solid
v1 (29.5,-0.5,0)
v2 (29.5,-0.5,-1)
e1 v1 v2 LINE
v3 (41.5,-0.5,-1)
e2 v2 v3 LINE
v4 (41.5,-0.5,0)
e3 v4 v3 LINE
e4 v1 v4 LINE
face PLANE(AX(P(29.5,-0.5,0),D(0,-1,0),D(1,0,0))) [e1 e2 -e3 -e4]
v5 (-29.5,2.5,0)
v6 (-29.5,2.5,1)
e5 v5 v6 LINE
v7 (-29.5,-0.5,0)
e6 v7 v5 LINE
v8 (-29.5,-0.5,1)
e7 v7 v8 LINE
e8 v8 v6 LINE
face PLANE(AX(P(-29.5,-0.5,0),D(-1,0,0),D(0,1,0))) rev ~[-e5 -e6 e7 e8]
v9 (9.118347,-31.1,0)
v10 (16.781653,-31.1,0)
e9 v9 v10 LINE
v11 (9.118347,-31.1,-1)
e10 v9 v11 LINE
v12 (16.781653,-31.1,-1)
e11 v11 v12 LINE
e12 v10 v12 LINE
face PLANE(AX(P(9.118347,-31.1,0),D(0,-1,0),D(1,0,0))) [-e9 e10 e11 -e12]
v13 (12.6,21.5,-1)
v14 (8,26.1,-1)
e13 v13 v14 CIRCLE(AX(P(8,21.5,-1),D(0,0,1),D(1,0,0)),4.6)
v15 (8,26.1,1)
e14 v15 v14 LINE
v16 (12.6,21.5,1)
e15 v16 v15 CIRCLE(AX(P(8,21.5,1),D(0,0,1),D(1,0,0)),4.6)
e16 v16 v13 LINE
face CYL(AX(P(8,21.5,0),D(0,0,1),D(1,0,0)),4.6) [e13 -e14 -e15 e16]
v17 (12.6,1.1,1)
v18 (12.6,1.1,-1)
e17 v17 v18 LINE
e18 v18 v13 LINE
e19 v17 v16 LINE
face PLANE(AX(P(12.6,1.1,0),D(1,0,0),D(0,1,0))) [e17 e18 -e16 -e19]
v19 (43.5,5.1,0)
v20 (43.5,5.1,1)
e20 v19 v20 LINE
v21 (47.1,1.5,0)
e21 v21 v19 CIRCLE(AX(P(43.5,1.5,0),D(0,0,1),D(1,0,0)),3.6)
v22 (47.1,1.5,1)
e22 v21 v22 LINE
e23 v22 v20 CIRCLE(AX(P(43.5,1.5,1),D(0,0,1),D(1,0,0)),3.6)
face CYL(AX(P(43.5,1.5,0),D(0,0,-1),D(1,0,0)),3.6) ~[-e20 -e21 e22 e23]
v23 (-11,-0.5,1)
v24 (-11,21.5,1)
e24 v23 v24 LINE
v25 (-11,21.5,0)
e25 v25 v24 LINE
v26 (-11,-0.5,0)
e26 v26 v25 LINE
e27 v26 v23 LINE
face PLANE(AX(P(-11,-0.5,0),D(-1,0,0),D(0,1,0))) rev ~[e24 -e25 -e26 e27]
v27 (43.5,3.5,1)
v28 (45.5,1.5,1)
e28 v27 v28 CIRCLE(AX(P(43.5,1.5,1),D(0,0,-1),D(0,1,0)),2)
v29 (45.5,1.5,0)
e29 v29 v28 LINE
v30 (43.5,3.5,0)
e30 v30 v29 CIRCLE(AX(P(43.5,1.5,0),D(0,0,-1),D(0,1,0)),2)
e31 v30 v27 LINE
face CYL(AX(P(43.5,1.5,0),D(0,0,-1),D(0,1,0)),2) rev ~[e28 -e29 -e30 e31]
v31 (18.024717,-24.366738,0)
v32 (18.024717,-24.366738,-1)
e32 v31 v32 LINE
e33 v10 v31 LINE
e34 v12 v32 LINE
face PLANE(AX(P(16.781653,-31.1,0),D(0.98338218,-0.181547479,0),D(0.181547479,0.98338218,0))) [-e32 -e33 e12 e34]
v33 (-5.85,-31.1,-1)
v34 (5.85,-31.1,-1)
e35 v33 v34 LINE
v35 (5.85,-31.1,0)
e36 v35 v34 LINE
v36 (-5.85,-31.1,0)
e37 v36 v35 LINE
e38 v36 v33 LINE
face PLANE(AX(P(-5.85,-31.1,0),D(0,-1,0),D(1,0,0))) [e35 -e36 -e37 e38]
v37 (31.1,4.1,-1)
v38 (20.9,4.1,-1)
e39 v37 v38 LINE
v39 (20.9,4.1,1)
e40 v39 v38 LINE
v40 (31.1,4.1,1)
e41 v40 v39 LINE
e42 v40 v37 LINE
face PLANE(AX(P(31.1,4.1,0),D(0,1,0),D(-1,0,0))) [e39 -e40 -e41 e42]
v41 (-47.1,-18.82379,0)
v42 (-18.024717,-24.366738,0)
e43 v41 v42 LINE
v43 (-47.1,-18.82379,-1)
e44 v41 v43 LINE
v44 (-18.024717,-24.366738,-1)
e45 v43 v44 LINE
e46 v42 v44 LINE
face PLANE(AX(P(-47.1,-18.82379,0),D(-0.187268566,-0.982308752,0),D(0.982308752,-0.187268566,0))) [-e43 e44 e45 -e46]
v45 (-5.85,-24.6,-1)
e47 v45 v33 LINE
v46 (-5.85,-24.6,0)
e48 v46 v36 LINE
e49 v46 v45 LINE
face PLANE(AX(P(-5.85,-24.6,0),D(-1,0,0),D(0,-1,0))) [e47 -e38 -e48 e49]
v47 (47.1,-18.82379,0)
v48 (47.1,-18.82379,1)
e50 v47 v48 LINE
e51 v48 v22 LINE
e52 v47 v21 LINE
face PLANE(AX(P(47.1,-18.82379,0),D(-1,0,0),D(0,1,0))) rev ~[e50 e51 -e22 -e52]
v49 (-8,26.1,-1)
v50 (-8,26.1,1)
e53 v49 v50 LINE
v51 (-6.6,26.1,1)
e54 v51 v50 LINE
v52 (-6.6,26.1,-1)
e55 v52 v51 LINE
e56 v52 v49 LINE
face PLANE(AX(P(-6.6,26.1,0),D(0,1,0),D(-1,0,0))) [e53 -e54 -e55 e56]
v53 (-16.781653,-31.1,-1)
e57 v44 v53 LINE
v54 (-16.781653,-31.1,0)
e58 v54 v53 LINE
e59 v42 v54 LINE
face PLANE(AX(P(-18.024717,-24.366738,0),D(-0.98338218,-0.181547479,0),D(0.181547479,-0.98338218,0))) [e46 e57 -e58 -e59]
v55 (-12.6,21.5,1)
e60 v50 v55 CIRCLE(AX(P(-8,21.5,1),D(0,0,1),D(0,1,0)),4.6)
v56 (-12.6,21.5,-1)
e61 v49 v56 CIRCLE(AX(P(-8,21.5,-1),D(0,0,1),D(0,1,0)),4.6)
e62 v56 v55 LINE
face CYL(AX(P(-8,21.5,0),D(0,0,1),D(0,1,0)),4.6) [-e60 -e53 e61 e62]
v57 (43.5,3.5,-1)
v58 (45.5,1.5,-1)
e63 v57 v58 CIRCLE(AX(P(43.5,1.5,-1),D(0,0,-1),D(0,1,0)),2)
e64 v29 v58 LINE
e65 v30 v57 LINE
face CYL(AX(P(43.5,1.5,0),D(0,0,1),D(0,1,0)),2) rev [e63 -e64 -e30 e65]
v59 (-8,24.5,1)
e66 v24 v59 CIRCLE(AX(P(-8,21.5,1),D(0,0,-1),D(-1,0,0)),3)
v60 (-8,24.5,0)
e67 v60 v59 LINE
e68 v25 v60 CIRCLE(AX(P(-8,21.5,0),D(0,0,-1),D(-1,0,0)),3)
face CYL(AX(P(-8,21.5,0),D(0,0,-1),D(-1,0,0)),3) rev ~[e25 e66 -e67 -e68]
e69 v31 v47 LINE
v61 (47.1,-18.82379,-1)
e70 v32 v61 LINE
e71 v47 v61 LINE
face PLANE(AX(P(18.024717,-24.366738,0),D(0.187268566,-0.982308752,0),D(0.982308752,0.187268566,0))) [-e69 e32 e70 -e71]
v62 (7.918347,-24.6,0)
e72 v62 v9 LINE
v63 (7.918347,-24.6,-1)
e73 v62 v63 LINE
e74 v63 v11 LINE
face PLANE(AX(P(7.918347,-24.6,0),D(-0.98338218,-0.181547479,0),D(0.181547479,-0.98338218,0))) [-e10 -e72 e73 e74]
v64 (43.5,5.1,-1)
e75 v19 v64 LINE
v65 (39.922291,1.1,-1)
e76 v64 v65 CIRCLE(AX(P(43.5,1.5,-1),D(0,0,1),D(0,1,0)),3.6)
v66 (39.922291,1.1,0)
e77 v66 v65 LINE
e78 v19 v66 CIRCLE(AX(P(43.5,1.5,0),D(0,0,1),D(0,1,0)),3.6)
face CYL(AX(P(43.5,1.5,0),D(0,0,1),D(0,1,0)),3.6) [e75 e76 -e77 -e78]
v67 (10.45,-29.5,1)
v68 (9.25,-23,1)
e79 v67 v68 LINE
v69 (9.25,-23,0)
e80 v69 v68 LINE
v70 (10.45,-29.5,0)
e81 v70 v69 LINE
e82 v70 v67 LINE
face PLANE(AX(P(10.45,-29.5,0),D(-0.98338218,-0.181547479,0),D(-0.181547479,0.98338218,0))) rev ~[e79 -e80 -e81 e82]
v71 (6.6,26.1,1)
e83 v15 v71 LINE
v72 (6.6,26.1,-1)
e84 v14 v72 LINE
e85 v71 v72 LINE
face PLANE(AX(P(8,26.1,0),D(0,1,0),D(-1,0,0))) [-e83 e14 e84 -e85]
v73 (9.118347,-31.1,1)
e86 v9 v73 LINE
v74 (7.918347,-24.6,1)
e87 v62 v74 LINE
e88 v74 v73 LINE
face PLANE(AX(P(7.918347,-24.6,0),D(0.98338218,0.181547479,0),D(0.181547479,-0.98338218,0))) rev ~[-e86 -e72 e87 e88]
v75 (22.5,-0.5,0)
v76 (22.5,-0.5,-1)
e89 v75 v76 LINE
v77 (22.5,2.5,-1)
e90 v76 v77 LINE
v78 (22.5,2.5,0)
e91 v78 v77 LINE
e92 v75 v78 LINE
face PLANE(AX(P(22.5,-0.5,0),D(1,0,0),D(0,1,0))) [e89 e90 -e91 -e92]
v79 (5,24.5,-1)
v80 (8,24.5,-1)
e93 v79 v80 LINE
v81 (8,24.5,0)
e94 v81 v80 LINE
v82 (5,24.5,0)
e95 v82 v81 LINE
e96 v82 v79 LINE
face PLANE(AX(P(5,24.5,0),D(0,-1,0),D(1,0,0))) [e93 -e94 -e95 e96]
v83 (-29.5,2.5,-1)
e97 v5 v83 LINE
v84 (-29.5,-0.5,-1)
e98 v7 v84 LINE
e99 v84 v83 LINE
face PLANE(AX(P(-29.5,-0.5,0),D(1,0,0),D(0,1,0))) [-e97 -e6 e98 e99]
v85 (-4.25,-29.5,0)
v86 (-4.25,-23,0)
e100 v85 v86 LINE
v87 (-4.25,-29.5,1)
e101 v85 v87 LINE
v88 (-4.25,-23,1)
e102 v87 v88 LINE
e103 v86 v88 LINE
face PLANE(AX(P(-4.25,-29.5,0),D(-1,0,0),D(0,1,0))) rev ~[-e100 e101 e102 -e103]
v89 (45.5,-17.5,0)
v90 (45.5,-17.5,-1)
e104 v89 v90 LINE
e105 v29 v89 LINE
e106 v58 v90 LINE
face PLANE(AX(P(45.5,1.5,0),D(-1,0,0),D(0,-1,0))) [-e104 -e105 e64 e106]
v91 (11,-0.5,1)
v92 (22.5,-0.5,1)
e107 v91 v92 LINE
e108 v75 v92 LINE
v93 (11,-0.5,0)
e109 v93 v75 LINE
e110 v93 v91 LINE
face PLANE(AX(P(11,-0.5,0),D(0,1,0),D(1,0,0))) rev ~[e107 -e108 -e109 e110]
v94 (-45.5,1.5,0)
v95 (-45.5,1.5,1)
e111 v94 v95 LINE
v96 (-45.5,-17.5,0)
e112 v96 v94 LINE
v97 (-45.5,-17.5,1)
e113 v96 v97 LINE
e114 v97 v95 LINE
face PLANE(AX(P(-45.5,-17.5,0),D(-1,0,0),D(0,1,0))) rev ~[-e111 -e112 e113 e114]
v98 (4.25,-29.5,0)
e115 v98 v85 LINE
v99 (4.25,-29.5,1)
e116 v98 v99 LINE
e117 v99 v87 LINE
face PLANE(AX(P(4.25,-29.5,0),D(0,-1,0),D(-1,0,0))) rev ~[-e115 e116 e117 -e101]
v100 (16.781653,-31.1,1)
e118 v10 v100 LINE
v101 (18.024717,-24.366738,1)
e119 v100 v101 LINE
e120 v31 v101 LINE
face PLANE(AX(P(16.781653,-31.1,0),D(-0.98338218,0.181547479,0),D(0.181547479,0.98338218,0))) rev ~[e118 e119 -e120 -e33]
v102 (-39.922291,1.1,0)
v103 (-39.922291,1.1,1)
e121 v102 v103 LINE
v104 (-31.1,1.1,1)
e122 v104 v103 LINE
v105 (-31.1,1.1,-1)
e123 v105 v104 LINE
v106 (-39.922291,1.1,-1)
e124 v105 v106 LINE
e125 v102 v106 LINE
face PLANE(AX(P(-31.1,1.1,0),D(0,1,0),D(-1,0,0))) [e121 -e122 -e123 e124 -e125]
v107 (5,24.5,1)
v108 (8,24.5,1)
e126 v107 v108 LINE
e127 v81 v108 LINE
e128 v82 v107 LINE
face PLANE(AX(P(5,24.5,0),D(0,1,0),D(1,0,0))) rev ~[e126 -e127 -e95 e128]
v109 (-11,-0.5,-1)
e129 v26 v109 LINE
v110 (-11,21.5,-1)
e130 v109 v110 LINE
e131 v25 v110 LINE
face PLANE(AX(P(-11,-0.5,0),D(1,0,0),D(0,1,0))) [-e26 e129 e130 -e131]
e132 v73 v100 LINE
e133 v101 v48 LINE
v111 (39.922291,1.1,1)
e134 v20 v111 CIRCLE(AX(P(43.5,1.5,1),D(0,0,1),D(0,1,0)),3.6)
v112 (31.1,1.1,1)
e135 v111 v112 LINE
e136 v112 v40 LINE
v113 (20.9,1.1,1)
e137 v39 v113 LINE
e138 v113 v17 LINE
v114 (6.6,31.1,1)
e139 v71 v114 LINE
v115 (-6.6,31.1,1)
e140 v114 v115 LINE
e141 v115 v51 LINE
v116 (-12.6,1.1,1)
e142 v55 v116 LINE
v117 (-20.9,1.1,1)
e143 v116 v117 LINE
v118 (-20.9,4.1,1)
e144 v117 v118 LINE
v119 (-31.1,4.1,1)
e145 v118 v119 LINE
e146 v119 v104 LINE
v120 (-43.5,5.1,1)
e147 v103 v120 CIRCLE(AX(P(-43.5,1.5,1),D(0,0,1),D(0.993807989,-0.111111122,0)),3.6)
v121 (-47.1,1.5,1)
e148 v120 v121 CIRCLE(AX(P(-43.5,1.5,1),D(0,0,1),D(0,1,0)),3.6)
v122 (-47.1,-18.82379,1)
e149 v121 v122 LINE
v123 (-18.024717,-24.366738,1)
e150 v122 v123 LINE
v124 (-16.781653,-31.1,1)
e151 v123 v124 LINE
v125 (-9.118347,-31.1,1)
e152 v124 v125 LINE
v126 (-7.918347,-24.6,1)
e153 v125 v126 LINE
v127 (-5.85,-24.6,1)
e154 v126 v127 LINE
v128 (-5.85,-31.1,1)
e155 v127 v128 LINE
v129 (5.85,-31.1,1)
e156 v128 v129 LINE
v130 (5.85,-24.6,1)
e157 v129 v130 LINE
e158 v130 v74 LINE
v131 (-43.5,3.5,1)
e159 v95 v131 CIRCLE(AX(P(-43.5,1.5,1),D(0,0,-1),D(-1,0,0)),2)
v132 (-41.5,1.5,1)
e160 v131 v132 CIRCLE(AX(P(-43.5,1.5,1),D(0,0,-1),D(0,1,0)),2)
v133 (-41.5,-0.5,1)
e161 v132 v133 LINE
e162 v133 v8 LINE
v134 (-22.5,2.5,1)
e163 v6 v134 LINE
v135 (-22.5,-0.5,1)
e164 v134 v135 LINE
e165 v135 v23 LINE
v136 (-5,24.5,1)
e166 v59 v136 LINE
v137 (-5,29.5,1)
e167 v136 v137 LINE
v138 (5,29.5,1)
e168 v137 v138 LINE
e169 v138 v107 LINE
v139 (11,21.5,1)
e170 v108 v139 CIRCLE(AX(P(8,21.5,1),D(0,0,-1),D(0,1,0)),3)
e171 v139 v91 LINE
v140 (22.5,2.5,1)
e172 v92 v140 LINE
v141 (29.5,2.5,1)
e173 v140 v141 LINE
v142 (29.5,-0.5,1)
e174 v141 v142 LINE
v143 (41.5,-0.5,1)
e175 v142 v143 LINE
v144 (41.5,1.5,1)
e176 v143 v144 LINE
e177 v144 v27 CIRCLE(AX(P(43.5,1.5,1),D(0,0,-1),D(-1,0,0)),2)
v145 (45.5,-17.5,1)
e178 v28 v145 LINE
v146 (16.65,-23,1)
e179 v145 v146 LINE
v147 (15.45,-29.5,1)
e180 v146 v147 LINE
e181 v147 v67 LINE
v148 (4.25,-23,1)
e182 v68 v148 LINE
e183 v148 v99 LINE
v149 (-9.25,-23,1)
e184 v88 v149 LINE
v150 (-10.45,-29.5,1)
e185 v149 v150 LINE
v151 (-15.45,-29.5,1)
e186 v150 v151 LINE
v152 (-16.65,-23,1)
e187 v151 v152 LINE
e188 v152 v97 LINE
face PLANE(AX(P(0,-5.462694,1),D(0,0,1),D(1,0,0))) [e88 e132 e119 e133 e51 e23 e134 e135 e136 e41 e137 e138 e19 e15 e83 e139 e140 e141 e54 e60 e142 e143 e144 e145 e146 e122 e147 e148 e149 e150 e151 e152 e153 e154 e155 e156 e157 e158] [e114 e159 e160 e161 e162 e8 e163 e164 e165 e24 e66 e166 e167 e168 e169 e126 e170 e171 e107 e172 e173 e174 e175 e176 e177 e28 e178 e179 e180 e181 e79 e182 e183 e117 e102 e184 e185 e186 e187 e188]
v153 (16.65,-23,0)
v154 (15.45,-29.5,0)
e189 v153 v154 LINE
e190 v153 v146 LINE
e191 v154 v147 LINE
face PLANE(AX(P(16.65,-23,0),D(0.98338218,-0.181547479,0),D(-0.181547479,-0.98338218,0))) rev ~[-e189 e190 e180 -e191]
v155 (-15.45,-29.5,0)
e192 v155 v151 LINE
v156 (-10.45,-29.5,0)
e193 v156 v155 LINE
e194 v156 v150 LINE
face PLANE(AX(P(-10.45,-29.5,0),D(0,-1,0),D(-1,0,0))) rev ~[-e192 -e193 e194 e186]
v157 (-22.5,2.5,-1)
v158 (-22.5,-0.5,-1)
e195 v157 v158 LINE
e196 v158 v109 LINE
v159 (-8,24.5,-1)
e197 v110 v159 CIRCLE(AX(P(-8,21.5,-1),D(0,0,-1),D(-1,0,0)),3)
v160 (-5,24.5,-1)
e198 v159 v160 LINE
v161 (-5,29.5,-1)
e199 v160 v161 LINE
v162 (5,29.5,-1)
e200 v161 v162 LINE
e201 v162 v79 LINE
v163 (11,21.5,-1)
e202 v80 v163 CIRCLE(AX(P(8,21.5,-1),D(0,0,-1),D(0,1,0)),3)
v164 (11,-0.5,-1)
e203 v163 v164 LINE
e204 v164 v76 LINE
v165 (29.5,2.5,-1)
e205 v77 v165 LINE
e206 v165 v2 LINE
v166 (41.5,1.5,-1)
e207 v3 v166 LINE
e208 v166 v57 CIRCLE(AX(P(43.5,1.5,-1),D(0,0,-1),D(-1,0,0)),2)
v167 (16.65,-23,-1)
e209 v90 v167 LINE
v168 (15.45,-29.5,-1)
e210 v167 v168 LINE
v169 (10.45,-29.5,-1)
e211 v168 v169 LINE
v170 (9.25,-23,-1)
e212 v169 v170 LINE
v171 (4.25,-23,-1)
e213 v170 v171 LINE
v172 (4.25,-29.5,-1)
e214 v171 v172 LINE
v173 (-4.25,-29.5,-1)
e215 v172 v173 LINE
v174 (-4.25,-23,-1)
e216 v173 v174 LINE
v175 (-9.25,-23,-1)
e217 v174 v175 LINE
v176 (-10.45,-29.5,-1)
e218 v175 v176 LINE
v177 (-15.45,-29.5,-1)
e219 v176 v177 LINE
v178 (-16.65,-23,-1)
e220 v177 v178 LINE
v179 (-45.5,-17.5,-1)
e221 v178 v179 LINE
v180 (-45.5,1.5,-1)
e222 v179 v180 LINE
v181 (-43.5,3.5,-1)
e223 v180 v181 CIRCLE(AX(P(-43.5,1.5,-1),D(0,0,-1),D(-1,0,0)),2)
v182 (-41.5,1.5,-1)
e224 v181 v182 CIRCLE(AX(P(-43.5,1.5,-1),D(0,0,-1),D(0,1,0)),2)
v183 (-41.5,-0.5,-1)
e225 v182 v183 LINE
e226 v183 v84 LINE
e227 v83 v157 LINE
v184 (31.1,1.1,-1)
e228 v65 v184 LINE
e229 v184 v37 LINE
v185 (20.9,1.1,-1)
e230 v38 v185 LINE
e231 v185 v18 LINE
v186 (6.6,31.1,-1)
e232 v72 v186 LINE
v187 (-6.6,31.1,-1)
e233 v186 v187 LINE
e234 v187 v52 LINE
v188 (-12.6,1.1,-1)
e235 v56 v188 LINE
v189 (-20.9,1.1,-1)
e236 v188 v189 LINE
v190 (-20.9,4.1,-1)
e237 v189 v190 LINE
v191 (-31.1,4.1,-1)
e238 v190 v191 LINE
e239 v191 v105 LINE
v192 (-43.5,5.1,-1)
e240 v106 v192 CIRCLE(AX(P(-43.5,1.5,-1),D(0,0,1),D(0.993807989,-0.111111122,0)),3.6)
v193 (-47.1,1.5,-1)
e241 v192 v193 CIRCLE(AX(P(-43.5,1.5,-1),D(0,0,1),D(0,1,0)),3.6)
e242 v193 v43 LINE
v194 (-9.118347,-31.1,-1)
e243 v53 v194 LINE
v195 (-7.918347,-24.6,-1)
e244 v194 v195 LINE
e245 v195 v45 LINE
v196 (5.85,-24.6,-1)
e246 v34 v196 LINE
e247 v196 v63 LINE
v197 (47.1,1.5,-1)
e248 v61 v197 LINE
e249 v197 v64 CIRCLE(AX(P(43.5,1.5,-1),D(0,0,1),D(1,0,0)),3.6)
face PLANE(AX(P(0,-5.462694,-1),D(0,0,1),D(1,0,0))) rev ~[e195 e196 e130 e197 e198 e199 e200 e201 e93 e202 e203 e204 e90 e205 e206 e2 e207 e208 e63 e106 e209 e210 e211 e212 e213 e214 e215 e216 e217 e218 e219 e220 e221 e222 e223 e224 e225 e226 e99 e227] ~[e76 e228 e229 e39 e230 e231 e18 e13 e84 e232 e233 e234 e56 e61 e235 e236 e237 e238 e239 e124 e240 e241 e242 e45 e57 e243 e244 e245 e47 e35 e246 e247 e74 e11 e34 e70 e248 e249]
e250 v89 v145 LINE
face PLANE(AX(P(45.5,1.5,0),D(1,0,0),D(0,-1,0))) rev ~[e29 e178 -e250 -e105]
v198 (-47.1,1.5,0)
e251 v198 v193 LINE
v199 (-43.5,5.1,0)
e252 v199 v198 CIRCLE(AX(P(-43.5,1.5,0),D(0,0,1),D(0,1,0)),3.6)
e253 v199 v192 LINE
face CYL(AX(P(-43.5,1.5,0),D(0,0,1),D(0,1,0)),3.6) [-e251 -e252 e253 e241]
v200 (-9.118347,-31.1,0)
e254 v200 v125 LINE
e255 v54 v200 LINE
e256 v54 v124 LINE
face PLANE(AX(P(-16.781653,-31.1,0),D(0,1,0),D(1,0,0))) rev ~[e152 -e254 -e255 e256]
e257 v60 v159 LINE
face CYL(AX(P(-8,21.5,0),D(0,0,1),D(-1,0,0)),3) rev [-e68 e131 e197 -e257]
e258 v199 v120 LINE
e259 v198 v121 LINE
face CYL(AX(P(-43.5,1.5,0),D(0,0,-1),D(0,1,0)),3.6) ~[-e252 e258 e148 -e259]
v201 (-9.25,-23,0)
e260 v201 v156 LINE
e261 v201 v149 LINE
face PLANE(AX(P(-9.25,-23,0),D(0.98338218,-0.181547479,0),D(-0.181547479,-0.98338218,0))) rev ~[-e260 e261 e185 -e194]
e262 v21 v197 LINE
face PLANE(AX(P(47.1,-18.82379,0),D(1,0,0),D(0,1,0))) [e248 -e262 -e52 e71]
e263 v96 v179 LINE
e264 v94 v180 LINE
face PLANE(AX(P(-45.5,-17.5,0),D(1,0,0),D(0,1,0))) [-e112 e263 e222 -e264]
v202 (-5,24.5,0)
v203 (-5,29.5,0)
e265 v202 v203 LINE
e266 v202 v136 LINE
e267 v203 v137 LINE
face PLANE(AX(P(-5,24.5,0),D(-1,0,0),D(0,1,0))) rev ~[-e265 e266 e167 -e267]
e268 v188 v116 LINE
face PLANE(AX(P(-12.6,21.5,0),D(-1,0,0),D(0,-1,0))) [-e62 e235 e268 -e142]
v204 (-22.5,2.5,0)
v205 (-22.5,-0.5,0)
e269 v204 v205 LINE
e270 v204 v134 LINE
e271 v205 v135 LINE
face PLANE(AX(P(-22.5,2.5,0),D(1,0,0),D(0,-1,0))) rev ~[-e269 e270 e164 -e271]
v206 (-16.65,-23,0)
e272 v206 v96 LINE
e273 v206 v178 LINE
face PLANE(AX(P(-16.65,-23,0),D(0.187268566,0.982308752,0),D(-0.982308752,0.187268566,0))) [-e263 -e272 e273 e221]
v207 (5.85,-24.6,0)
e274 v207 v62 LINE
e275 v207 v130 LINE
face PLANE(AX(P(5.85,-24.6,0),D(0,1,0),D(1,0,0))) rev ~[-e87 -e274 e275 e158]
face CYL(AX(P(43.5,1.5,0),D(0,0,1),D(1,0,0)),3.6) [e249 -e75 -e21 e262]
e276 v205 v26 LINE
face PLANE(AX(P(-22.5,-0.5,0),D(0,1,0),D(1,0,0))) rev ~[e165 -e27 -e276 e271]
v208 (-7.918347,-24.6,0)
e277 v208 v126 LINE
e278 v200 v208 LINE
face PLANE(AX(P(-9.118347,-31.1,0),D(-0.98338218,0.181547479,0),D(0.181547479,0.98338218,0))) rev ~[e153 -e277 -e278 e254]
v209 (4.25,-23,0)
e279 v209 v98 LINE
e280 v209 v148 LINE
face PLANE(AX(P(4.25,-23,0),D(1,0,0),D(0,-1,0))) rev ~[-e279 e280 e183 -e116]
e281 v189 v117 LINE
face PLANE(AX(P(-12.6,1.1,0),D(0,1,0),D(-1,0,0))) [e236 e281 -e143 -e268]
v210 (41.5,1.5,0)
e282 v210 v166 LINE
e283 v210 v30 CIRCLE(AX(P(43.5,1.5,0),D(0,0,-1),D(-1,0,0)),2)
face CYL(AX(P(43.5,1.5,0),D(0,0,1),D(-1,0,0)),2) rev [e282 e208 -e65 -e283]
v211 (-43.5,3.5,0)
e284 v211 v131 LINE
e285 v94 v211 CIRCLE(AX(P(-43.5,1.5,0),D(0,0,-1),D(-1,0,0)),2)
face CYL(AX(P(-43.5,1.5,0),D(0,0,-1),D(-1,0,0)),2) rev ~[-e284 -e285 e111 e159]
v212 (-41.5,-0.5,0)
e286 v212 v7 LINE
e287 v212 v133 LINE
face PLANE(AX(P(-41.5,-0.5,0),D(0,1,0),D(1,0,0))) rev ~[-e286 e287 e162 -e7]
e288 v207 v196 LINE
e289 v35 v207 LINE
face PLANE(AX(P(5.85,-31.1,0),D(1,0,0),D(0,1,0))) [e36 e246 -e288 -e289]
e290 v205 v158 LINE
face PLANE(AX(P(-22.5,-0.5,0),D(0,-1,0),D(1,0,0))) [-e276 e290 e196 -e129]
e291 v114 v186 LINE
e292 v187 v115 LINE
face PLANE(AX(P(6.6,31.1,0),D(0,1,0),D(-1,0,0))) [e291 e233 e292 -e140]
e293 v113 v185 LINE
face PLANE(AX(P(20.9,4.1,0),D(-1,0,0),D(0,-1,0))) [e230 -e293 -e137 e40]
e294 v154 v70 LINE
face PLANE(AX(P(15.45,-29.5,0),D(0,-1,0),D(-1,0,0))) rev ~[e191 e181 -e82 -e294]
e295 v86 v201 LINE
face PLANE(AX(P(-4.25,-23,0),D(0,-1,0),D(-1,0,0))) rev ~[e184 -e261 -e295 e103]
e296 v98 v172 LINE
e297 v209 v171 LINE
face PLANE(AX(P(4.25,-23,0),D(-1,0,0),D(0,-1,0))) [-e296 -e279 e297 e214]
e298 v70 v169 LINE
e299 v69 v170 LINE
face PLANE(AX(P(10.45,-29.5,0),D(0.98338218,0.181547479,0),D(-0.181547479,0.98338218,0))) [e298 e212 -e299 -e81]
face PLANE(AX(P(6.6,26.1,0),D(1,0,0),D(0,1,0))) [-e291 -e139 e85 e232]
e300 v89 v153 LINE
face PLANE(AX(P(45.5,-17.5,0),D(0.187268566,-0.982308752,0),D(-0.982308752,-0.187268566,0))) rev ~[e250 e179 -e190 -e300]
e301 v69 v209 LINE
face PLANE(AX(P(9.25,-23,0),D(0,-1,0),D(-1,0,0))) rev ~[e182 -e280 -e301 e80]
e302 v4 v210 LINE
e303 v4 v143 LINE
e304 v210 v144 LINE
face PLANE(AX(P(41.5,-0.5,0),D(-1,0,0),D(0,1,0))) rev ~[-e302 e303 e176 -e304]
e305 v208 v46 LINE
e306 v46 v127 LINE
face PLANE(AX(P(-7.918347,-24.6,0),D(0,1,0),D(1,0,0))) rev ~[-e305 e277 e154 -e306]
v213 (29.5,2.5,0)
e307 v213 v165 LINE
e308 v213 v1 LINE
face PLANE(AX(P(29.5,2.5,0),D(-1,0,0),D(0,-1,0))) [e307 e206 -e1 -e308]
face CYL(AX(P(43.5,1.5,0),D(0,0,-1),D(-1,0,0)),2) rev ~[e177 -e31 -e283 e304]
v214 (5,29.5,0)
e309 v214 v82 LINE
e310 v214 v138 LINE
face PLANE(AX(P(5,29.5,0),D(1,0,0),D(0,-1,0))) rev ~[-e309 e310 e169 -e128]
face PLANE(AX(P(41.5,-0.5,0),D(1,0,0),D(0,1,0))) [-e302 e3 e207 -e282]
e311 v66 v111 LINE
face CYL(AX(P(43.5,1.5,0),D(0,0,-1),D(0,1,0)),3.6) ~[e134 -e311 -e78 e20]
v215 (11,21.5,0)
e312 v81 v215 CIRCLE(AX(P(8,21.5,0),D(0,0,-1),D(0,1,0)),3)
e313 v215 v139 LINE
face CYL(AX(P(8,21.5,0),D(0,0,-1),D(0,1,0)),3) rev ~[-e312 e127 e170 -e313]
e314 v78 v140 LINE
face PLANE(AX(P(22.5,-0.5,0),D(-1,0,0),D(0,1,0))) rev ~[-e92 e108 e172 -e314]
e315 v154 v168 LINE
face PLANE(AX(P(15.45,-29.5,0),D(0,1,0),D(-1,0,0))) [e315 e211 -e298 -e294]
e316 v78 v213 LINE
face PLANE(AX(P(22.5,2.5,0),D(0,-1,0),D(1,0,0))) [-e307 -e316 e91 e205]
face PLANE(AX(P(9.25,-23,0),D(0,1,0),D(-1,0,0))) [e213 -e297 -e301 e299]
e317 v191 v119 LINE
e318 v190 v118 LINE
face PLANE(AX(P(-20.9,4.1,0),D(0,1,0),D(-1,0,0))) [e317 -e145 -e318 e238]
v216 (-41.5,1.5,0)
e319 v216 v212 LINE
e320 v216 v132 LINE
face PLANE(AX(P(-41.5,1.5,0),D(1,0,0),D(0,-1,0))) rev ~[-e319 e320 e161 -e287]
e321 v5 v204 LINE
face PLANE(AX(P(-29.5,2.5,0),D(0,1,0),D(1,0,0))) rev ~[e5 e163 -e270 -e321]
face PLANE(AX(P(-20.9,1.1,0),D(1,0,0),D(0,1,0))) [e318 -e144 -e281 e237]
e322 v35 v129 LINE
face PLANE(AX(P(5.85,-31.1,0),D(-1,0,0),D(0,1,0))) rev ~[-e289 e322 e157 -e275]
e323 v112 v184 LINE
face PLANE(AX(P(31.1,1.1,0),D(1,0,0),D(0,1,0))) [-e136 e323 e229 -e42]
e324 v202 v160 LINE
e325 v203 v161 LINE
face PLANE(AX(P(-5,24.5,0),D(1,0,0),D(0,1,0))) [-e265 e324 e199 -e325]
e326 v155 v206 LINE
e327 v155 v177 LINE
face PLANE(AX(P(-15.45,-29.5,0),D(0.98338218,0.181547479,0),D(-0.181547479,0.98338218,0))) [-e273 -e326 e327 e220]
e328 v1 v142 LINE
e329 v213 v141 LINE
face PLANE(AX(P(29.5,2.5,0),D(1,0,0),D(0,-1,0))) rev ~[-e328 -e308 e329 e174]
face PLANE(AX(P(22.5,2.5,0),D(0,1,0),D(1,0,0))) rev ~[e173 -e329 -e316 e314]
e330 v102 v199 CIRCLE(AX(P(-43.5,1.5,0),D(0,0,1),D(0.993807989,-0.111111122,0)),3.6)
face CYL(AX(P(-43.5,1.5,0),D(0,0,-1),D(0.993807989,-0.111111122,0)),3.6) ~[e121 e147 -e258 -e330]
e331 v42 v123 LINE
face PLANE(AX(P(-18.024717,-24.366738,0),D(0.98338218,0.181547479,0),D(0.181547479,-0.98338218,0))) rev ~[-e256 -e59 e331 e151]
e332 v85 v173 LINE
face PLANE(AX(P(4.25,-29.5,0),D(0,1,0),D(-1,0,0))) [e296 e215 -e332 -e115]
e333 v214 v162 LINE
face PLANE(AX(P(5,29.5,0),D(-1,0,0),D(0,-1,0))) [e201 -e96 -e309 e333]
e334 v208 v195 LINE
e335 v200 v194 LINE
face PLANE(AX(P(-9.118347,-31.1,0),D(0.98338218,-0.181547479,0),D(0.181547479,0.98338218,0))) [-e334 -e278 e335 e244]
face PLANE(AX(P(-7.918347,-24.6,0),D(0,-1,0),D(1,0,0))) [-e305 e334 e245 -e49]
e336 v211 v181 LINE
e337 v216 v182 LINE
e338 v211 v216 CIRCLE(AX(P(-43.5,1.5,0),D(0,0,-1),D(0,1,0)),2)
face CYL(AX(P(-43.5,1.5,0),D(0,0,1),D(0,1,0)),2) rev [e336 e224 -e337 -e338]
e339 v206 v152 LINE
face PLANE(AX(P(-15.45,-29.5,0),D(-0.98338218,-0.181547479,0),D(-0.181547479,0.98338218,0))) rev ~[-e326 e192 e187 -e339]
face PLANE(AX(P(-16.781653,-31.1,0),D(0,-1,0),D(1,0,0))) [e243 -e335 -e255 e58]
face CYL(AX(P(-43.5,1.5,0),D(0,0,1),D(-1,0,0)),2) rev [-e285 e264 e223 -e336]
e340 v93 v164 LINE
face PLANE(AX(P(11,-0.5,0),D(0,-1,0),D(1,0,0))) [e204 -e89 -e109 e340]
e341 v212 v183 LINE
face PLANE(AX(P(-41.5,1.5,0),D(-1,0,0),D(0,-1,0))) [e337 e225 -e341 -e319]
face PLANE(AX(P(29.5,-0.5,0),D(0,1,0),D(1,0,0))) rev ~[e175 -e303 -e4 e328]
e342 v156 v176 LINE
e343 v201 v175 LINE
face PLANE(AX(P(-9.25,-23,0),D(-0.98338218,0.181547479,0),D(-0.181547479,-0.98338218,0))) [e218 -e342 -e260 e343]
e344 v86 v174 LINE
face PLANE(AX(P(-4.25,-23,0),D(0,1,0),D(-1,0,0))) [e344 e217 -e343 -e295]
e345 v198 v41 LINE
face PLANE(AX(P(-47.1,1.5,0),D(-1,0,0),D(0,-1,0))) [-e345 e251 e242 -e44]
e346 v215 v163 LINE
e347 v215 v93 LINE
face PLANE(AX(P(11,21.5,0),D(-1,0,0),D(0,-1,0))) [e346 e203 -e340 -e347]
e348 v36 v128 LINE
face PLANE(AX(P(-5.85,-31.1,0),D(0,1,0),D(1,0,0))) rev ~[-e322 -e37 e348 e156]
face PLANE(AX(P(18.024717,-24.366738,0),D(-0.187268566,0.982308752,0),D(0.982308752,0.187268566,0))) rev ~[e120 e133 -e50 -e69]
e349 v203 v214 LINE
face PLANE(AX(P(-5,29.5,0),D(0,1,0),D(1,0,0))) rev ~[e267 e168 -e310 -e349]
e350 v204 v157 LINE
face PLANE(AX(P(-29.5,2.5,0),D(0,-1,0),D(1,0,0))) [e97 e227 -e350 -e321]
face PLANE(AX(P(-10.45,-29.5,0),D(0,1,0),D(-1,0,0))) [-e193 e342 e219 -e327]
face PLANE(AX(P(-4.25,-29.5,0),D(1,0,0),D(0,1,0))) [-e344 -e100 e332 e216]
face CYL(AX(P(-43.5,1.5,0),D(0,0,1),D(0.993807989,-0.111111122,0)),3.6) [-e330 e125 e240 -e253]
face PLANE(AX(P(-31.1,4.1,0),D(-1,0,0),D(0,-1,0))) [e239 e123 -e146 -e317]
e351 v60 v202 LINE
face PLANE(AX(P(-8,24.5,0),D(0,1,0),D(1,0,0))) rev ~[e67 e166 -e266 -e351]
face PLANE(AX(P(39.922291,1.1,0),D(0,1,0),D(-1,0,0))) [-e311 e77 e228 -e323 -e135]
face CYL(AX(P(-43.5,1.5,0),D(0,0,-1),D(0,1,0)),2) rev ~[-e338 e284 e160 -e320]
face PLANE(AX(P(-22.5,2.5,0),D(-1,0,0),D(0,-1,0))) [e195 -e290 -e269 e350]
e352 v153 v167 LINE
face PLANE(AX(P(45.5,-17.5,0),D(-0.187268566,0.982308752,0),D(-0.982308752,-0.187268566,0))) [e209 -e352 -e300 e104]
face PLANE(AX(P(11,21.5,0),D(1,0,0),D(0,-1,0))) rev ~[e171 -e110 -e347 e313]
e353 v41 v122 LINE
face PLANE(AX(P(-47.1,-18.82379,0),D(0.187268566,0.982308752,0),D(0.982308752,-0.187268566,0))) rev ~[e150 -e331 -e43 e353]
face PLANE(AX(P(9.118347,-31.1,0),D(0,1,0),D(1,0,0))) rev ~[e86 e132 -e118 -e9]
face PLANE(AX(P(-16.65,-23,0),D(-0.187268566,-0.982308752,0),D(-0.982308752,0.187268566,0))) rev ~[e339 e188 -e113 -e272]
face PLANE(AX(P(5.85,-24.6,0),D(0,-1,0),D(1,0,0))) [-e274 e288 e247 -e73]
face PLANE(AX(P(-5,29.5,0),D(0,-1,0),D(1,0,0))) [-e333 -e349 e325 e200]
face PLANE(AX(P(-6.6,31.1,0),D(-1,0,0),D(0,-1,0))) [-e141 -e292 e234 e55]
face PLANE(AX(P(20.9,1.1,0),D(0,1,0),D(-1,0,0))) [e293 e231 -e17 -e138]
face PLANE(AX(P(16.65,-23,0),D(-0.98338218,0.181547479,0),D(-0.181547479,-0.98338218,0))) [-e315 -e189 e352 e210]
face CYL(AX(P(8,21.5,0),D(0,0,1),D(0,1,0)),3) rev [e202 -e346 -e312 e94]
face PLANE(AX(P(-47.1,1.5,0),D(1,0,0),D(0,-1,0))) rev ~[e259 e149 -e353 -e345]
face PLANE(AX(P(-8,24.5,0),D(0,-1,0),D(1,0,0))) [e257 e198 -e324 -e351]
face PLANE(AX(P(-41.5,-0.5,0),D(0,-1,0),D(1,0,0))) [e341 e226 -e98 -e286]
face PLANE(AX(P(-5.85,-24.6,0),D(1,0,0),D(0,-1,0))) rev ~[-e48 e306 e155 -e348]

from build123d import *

# Parameters (mm, degrees)
F1_DEPTH = 1


# Not quite as in the source:
# - a feature names something its author has since deleted; it is built from what else it names


with BuildPart() as f1:
    # F0 (on Top) → F1 (new body, symmetric)
    with BuildSketch(Plane.XY):
        with BuildLine():
            Line((6.5999999642, 31.0999999642), (0, 31.0999999642))
            Line((0, 31.0999999642), (-6.5999999642, 31.0999999642))
            Line((-6.5999999642, 31.0999999642), (-6.5999999642, 26.0999999642))
            Line((-6.5999999642, 26.0999999642), (-8, 26.0999999642))
            ThreePointArc((-8, 26.0999999642), (-11.2526911682, 24.7526911682), (-12.5999999642, 21.5))
            Line((-12.5999999642, 21.5), (-12.5999999642, 1.0999999642))
            Line((-12.5999999642, 1.0999999642), (-20.9000000358, 1.0999999642))
            Line((-20.9000000358, 1.0999999642), (-20.9000000358, 4.0999999642))
            Line((-20.9000000358, 4.0999999642), (-31.0999999642, 4.0999999642))
            Line((-31.0999999642, 4.0999999642), (-31.0999999642, 1.0999999642))
            Line((-31.0999999642, 1.0999999642), (-39.922291276, 1.0999999642))
            ThreePointArc((-39.922291276, 1.0999999642), (-40.8167184403, 3.8999999613), (-43.5, 5.0999999642))
            ThreePointArc((-43.5, 5.0999999642), (-46.045584387, 4.045584387), (-47.0999999642, 1.5))
            Line((-47.0999999642, 1.5), (-47.0999999642, -18.823789758))
            Line((-47.0999999642, -18.823789758), (-18.0247169235, -24.366737998))
            Line((-18.0247169235, -24.366737998), (-16.7816531759, -31.0999999642))
            Line((-16.7816531759, -31.0999999642), (-9.1183468241, -31.0999999642))
            Line((-9.1183468241, -31.0999999642), (-7.9183468241, -24.5999999642))
            Line((-7.9183468241, -24.5999999642), (-5.8499999642, -24.5999999642))
            Line((-5.8499999642, -24.5999999642), (-5.8499999642, -31.0999999642))
            Line((-5.8499999642, -31.0999999642), (0, -31.0999999642))
            Line((0, -31.0999999642), (5.8499999642, -31.0999999642))
            Line((5.8499999642, -31.0999999642), (5.8499999642, -24.5999999642))
            Line((5.8499999642, -24.5999999642), (7.9183468241, -24.5999999642))
            Line((7.9183468241, -24.5999999642), (9.1183468241, -31.0999999642))
            Line((9.1183468241, -31.0999999642), (16.7816531759, -31.0999999642))
            Line((16.7816531759, -31.0999999642), (18.0247169235, -24.366737998))
            Line((18.0247169235, -24.366737998), (47.0999999642, -18.823789758))
            Line((47.0999999642, -18.823789758), (47.0999999642, 1.5))
            ThreePointArc((47.0999999642, 1.5), (46.045584387, 4.045584387), (43.5, 5.0999999642))
            ThreePointArc((43.5, 5.0999999642), (40.8167184403, 3.8999999613), (39.922291276, 1.0999999642))
            Line((39.922291276, 1.0999999642), (31.0999999642, 1.0999999642))
            Line((31.0999999642, 1.0999999642), (31.0999999642, 4.0999999642))
            Line((31.0999999642, 4.0999999642), (20.9000000358, 4.0999999642))
            Line((20.9000000358, 4.0999999642), (20.9000000358, 1.0999999642))
            Line((20.9000000358, 1.0999999642), (12.5999999642, 1.0999999642))
            Line((12.5999999642, 1.0999999642), (12.5999999642, 21.5))
            ThreePointArc((12.5999999642, 21.5), (11.2526911682, 24.7526911682), (8, 26.0999999642))
            Line((8, 26.0999999642), (6.5999999642, 26.0999999642))
            Line((6.5999999642, 26.0999999642), (6.5999999642, 31.0999999642))
        make_face()
        with BuildLine():
            Line((-5, 29.5), (0, 29.5))
            Line((0, 29.5), (5, 29.5))
            Line((5, 29.5), (5, 24.5))
            Line((5, 24.5), (8, 24.5))
            ThreePointArc((8, 24.5), (10.1213203436, 23.6213203436), (11, 21.5))
            Line((11, 21.5), (11, -0.5))
            Line((11, -0.5), (22.5, -0.5))
            Line((22.5, -0.5), (22.5, 2.5))
            Line((22.5, 2.5), (29.5, 2.5))
            Line((29.5, 2.5), (29.5, -0.5))
            Line((29.5, -0.5), (41.5, -0.5))
            Line((41.5, -0.5), (41.5, 1.5))
            ThreePointArc((41.5, 1.5), (42.0857864376, 2.9142135624), (43.5, 3.5))
            ThreePointArc((43.5, 3.5), (44.9142135624, 2.9142135624), (45.5, 1.5))
            Line((45.5, 1.5), (45.5, -17.5))
            Line((45.5, -17.5), (16.65, -23))
            Line((16.65, -23), (15.45, -29.5))
            Line((15.45, -29.5), (10.45, -29.5))
            Line((10.45, -29.5), (9.25, -23))
            Line((9.25, -23), (4.25, -23))
            Line((4.25, -23), (4.25, -29.5))
            Line((4.25, -29.5), (0, -29.5))
            Line((0, -29.5), (-4.25, -29.5))
            Line((-4.25, -29.5), (-4.25, -23))
            Line((-4.25, -23), (-9.25, -23))
            Line((-9.25, -23), (-10.45, -29.5))
            Line((-10.45, -29.5), (-15.45, -29.5))
            Line((-15.45, -29.5), (-16.65, -23))
            Line((-16.65, -23), (-45.5, -17.5))
            Line((-45.5, -17.5), (-45.5, 1.5))
            ThreePointArc((-45.5, 1.5), (-44.9142135624, 2.9142135624), (-43.5, 3.5))
            ThreePointArc((-43.5, 3.5), (-42.0857864376, 2.9142135624), (-41.5, 1.5))
            Line((-41.5, 1.5), (-41.5, -0.5))
            Line((-41.5, -0.5), (-29.5, -0.5))
            Line((-29.5, -0.5), (-29.5, 2.5))
            Line((-29.5, 2.5), (-22.5, 2.5))
            Line((-22.5, 2.5), (-22.5, -0.5))
            Line((-22.5, -0.5), (-11, -0.5))
            Line((-11, -0.5), (-11, 21.5))
            ThreePointArc((-11, 21.5), (-10.1213203436, 23.6213203436), (-8, 24.5))
            Line((-8, 24.5), (-5, 24.5))
            Line((-5, 24.5), (-5, 29.5))
        make_face(mode=Mode.SUBTRACT)
    extrude(amount=F1_DEPTH, both=True)


solid = f1.part
